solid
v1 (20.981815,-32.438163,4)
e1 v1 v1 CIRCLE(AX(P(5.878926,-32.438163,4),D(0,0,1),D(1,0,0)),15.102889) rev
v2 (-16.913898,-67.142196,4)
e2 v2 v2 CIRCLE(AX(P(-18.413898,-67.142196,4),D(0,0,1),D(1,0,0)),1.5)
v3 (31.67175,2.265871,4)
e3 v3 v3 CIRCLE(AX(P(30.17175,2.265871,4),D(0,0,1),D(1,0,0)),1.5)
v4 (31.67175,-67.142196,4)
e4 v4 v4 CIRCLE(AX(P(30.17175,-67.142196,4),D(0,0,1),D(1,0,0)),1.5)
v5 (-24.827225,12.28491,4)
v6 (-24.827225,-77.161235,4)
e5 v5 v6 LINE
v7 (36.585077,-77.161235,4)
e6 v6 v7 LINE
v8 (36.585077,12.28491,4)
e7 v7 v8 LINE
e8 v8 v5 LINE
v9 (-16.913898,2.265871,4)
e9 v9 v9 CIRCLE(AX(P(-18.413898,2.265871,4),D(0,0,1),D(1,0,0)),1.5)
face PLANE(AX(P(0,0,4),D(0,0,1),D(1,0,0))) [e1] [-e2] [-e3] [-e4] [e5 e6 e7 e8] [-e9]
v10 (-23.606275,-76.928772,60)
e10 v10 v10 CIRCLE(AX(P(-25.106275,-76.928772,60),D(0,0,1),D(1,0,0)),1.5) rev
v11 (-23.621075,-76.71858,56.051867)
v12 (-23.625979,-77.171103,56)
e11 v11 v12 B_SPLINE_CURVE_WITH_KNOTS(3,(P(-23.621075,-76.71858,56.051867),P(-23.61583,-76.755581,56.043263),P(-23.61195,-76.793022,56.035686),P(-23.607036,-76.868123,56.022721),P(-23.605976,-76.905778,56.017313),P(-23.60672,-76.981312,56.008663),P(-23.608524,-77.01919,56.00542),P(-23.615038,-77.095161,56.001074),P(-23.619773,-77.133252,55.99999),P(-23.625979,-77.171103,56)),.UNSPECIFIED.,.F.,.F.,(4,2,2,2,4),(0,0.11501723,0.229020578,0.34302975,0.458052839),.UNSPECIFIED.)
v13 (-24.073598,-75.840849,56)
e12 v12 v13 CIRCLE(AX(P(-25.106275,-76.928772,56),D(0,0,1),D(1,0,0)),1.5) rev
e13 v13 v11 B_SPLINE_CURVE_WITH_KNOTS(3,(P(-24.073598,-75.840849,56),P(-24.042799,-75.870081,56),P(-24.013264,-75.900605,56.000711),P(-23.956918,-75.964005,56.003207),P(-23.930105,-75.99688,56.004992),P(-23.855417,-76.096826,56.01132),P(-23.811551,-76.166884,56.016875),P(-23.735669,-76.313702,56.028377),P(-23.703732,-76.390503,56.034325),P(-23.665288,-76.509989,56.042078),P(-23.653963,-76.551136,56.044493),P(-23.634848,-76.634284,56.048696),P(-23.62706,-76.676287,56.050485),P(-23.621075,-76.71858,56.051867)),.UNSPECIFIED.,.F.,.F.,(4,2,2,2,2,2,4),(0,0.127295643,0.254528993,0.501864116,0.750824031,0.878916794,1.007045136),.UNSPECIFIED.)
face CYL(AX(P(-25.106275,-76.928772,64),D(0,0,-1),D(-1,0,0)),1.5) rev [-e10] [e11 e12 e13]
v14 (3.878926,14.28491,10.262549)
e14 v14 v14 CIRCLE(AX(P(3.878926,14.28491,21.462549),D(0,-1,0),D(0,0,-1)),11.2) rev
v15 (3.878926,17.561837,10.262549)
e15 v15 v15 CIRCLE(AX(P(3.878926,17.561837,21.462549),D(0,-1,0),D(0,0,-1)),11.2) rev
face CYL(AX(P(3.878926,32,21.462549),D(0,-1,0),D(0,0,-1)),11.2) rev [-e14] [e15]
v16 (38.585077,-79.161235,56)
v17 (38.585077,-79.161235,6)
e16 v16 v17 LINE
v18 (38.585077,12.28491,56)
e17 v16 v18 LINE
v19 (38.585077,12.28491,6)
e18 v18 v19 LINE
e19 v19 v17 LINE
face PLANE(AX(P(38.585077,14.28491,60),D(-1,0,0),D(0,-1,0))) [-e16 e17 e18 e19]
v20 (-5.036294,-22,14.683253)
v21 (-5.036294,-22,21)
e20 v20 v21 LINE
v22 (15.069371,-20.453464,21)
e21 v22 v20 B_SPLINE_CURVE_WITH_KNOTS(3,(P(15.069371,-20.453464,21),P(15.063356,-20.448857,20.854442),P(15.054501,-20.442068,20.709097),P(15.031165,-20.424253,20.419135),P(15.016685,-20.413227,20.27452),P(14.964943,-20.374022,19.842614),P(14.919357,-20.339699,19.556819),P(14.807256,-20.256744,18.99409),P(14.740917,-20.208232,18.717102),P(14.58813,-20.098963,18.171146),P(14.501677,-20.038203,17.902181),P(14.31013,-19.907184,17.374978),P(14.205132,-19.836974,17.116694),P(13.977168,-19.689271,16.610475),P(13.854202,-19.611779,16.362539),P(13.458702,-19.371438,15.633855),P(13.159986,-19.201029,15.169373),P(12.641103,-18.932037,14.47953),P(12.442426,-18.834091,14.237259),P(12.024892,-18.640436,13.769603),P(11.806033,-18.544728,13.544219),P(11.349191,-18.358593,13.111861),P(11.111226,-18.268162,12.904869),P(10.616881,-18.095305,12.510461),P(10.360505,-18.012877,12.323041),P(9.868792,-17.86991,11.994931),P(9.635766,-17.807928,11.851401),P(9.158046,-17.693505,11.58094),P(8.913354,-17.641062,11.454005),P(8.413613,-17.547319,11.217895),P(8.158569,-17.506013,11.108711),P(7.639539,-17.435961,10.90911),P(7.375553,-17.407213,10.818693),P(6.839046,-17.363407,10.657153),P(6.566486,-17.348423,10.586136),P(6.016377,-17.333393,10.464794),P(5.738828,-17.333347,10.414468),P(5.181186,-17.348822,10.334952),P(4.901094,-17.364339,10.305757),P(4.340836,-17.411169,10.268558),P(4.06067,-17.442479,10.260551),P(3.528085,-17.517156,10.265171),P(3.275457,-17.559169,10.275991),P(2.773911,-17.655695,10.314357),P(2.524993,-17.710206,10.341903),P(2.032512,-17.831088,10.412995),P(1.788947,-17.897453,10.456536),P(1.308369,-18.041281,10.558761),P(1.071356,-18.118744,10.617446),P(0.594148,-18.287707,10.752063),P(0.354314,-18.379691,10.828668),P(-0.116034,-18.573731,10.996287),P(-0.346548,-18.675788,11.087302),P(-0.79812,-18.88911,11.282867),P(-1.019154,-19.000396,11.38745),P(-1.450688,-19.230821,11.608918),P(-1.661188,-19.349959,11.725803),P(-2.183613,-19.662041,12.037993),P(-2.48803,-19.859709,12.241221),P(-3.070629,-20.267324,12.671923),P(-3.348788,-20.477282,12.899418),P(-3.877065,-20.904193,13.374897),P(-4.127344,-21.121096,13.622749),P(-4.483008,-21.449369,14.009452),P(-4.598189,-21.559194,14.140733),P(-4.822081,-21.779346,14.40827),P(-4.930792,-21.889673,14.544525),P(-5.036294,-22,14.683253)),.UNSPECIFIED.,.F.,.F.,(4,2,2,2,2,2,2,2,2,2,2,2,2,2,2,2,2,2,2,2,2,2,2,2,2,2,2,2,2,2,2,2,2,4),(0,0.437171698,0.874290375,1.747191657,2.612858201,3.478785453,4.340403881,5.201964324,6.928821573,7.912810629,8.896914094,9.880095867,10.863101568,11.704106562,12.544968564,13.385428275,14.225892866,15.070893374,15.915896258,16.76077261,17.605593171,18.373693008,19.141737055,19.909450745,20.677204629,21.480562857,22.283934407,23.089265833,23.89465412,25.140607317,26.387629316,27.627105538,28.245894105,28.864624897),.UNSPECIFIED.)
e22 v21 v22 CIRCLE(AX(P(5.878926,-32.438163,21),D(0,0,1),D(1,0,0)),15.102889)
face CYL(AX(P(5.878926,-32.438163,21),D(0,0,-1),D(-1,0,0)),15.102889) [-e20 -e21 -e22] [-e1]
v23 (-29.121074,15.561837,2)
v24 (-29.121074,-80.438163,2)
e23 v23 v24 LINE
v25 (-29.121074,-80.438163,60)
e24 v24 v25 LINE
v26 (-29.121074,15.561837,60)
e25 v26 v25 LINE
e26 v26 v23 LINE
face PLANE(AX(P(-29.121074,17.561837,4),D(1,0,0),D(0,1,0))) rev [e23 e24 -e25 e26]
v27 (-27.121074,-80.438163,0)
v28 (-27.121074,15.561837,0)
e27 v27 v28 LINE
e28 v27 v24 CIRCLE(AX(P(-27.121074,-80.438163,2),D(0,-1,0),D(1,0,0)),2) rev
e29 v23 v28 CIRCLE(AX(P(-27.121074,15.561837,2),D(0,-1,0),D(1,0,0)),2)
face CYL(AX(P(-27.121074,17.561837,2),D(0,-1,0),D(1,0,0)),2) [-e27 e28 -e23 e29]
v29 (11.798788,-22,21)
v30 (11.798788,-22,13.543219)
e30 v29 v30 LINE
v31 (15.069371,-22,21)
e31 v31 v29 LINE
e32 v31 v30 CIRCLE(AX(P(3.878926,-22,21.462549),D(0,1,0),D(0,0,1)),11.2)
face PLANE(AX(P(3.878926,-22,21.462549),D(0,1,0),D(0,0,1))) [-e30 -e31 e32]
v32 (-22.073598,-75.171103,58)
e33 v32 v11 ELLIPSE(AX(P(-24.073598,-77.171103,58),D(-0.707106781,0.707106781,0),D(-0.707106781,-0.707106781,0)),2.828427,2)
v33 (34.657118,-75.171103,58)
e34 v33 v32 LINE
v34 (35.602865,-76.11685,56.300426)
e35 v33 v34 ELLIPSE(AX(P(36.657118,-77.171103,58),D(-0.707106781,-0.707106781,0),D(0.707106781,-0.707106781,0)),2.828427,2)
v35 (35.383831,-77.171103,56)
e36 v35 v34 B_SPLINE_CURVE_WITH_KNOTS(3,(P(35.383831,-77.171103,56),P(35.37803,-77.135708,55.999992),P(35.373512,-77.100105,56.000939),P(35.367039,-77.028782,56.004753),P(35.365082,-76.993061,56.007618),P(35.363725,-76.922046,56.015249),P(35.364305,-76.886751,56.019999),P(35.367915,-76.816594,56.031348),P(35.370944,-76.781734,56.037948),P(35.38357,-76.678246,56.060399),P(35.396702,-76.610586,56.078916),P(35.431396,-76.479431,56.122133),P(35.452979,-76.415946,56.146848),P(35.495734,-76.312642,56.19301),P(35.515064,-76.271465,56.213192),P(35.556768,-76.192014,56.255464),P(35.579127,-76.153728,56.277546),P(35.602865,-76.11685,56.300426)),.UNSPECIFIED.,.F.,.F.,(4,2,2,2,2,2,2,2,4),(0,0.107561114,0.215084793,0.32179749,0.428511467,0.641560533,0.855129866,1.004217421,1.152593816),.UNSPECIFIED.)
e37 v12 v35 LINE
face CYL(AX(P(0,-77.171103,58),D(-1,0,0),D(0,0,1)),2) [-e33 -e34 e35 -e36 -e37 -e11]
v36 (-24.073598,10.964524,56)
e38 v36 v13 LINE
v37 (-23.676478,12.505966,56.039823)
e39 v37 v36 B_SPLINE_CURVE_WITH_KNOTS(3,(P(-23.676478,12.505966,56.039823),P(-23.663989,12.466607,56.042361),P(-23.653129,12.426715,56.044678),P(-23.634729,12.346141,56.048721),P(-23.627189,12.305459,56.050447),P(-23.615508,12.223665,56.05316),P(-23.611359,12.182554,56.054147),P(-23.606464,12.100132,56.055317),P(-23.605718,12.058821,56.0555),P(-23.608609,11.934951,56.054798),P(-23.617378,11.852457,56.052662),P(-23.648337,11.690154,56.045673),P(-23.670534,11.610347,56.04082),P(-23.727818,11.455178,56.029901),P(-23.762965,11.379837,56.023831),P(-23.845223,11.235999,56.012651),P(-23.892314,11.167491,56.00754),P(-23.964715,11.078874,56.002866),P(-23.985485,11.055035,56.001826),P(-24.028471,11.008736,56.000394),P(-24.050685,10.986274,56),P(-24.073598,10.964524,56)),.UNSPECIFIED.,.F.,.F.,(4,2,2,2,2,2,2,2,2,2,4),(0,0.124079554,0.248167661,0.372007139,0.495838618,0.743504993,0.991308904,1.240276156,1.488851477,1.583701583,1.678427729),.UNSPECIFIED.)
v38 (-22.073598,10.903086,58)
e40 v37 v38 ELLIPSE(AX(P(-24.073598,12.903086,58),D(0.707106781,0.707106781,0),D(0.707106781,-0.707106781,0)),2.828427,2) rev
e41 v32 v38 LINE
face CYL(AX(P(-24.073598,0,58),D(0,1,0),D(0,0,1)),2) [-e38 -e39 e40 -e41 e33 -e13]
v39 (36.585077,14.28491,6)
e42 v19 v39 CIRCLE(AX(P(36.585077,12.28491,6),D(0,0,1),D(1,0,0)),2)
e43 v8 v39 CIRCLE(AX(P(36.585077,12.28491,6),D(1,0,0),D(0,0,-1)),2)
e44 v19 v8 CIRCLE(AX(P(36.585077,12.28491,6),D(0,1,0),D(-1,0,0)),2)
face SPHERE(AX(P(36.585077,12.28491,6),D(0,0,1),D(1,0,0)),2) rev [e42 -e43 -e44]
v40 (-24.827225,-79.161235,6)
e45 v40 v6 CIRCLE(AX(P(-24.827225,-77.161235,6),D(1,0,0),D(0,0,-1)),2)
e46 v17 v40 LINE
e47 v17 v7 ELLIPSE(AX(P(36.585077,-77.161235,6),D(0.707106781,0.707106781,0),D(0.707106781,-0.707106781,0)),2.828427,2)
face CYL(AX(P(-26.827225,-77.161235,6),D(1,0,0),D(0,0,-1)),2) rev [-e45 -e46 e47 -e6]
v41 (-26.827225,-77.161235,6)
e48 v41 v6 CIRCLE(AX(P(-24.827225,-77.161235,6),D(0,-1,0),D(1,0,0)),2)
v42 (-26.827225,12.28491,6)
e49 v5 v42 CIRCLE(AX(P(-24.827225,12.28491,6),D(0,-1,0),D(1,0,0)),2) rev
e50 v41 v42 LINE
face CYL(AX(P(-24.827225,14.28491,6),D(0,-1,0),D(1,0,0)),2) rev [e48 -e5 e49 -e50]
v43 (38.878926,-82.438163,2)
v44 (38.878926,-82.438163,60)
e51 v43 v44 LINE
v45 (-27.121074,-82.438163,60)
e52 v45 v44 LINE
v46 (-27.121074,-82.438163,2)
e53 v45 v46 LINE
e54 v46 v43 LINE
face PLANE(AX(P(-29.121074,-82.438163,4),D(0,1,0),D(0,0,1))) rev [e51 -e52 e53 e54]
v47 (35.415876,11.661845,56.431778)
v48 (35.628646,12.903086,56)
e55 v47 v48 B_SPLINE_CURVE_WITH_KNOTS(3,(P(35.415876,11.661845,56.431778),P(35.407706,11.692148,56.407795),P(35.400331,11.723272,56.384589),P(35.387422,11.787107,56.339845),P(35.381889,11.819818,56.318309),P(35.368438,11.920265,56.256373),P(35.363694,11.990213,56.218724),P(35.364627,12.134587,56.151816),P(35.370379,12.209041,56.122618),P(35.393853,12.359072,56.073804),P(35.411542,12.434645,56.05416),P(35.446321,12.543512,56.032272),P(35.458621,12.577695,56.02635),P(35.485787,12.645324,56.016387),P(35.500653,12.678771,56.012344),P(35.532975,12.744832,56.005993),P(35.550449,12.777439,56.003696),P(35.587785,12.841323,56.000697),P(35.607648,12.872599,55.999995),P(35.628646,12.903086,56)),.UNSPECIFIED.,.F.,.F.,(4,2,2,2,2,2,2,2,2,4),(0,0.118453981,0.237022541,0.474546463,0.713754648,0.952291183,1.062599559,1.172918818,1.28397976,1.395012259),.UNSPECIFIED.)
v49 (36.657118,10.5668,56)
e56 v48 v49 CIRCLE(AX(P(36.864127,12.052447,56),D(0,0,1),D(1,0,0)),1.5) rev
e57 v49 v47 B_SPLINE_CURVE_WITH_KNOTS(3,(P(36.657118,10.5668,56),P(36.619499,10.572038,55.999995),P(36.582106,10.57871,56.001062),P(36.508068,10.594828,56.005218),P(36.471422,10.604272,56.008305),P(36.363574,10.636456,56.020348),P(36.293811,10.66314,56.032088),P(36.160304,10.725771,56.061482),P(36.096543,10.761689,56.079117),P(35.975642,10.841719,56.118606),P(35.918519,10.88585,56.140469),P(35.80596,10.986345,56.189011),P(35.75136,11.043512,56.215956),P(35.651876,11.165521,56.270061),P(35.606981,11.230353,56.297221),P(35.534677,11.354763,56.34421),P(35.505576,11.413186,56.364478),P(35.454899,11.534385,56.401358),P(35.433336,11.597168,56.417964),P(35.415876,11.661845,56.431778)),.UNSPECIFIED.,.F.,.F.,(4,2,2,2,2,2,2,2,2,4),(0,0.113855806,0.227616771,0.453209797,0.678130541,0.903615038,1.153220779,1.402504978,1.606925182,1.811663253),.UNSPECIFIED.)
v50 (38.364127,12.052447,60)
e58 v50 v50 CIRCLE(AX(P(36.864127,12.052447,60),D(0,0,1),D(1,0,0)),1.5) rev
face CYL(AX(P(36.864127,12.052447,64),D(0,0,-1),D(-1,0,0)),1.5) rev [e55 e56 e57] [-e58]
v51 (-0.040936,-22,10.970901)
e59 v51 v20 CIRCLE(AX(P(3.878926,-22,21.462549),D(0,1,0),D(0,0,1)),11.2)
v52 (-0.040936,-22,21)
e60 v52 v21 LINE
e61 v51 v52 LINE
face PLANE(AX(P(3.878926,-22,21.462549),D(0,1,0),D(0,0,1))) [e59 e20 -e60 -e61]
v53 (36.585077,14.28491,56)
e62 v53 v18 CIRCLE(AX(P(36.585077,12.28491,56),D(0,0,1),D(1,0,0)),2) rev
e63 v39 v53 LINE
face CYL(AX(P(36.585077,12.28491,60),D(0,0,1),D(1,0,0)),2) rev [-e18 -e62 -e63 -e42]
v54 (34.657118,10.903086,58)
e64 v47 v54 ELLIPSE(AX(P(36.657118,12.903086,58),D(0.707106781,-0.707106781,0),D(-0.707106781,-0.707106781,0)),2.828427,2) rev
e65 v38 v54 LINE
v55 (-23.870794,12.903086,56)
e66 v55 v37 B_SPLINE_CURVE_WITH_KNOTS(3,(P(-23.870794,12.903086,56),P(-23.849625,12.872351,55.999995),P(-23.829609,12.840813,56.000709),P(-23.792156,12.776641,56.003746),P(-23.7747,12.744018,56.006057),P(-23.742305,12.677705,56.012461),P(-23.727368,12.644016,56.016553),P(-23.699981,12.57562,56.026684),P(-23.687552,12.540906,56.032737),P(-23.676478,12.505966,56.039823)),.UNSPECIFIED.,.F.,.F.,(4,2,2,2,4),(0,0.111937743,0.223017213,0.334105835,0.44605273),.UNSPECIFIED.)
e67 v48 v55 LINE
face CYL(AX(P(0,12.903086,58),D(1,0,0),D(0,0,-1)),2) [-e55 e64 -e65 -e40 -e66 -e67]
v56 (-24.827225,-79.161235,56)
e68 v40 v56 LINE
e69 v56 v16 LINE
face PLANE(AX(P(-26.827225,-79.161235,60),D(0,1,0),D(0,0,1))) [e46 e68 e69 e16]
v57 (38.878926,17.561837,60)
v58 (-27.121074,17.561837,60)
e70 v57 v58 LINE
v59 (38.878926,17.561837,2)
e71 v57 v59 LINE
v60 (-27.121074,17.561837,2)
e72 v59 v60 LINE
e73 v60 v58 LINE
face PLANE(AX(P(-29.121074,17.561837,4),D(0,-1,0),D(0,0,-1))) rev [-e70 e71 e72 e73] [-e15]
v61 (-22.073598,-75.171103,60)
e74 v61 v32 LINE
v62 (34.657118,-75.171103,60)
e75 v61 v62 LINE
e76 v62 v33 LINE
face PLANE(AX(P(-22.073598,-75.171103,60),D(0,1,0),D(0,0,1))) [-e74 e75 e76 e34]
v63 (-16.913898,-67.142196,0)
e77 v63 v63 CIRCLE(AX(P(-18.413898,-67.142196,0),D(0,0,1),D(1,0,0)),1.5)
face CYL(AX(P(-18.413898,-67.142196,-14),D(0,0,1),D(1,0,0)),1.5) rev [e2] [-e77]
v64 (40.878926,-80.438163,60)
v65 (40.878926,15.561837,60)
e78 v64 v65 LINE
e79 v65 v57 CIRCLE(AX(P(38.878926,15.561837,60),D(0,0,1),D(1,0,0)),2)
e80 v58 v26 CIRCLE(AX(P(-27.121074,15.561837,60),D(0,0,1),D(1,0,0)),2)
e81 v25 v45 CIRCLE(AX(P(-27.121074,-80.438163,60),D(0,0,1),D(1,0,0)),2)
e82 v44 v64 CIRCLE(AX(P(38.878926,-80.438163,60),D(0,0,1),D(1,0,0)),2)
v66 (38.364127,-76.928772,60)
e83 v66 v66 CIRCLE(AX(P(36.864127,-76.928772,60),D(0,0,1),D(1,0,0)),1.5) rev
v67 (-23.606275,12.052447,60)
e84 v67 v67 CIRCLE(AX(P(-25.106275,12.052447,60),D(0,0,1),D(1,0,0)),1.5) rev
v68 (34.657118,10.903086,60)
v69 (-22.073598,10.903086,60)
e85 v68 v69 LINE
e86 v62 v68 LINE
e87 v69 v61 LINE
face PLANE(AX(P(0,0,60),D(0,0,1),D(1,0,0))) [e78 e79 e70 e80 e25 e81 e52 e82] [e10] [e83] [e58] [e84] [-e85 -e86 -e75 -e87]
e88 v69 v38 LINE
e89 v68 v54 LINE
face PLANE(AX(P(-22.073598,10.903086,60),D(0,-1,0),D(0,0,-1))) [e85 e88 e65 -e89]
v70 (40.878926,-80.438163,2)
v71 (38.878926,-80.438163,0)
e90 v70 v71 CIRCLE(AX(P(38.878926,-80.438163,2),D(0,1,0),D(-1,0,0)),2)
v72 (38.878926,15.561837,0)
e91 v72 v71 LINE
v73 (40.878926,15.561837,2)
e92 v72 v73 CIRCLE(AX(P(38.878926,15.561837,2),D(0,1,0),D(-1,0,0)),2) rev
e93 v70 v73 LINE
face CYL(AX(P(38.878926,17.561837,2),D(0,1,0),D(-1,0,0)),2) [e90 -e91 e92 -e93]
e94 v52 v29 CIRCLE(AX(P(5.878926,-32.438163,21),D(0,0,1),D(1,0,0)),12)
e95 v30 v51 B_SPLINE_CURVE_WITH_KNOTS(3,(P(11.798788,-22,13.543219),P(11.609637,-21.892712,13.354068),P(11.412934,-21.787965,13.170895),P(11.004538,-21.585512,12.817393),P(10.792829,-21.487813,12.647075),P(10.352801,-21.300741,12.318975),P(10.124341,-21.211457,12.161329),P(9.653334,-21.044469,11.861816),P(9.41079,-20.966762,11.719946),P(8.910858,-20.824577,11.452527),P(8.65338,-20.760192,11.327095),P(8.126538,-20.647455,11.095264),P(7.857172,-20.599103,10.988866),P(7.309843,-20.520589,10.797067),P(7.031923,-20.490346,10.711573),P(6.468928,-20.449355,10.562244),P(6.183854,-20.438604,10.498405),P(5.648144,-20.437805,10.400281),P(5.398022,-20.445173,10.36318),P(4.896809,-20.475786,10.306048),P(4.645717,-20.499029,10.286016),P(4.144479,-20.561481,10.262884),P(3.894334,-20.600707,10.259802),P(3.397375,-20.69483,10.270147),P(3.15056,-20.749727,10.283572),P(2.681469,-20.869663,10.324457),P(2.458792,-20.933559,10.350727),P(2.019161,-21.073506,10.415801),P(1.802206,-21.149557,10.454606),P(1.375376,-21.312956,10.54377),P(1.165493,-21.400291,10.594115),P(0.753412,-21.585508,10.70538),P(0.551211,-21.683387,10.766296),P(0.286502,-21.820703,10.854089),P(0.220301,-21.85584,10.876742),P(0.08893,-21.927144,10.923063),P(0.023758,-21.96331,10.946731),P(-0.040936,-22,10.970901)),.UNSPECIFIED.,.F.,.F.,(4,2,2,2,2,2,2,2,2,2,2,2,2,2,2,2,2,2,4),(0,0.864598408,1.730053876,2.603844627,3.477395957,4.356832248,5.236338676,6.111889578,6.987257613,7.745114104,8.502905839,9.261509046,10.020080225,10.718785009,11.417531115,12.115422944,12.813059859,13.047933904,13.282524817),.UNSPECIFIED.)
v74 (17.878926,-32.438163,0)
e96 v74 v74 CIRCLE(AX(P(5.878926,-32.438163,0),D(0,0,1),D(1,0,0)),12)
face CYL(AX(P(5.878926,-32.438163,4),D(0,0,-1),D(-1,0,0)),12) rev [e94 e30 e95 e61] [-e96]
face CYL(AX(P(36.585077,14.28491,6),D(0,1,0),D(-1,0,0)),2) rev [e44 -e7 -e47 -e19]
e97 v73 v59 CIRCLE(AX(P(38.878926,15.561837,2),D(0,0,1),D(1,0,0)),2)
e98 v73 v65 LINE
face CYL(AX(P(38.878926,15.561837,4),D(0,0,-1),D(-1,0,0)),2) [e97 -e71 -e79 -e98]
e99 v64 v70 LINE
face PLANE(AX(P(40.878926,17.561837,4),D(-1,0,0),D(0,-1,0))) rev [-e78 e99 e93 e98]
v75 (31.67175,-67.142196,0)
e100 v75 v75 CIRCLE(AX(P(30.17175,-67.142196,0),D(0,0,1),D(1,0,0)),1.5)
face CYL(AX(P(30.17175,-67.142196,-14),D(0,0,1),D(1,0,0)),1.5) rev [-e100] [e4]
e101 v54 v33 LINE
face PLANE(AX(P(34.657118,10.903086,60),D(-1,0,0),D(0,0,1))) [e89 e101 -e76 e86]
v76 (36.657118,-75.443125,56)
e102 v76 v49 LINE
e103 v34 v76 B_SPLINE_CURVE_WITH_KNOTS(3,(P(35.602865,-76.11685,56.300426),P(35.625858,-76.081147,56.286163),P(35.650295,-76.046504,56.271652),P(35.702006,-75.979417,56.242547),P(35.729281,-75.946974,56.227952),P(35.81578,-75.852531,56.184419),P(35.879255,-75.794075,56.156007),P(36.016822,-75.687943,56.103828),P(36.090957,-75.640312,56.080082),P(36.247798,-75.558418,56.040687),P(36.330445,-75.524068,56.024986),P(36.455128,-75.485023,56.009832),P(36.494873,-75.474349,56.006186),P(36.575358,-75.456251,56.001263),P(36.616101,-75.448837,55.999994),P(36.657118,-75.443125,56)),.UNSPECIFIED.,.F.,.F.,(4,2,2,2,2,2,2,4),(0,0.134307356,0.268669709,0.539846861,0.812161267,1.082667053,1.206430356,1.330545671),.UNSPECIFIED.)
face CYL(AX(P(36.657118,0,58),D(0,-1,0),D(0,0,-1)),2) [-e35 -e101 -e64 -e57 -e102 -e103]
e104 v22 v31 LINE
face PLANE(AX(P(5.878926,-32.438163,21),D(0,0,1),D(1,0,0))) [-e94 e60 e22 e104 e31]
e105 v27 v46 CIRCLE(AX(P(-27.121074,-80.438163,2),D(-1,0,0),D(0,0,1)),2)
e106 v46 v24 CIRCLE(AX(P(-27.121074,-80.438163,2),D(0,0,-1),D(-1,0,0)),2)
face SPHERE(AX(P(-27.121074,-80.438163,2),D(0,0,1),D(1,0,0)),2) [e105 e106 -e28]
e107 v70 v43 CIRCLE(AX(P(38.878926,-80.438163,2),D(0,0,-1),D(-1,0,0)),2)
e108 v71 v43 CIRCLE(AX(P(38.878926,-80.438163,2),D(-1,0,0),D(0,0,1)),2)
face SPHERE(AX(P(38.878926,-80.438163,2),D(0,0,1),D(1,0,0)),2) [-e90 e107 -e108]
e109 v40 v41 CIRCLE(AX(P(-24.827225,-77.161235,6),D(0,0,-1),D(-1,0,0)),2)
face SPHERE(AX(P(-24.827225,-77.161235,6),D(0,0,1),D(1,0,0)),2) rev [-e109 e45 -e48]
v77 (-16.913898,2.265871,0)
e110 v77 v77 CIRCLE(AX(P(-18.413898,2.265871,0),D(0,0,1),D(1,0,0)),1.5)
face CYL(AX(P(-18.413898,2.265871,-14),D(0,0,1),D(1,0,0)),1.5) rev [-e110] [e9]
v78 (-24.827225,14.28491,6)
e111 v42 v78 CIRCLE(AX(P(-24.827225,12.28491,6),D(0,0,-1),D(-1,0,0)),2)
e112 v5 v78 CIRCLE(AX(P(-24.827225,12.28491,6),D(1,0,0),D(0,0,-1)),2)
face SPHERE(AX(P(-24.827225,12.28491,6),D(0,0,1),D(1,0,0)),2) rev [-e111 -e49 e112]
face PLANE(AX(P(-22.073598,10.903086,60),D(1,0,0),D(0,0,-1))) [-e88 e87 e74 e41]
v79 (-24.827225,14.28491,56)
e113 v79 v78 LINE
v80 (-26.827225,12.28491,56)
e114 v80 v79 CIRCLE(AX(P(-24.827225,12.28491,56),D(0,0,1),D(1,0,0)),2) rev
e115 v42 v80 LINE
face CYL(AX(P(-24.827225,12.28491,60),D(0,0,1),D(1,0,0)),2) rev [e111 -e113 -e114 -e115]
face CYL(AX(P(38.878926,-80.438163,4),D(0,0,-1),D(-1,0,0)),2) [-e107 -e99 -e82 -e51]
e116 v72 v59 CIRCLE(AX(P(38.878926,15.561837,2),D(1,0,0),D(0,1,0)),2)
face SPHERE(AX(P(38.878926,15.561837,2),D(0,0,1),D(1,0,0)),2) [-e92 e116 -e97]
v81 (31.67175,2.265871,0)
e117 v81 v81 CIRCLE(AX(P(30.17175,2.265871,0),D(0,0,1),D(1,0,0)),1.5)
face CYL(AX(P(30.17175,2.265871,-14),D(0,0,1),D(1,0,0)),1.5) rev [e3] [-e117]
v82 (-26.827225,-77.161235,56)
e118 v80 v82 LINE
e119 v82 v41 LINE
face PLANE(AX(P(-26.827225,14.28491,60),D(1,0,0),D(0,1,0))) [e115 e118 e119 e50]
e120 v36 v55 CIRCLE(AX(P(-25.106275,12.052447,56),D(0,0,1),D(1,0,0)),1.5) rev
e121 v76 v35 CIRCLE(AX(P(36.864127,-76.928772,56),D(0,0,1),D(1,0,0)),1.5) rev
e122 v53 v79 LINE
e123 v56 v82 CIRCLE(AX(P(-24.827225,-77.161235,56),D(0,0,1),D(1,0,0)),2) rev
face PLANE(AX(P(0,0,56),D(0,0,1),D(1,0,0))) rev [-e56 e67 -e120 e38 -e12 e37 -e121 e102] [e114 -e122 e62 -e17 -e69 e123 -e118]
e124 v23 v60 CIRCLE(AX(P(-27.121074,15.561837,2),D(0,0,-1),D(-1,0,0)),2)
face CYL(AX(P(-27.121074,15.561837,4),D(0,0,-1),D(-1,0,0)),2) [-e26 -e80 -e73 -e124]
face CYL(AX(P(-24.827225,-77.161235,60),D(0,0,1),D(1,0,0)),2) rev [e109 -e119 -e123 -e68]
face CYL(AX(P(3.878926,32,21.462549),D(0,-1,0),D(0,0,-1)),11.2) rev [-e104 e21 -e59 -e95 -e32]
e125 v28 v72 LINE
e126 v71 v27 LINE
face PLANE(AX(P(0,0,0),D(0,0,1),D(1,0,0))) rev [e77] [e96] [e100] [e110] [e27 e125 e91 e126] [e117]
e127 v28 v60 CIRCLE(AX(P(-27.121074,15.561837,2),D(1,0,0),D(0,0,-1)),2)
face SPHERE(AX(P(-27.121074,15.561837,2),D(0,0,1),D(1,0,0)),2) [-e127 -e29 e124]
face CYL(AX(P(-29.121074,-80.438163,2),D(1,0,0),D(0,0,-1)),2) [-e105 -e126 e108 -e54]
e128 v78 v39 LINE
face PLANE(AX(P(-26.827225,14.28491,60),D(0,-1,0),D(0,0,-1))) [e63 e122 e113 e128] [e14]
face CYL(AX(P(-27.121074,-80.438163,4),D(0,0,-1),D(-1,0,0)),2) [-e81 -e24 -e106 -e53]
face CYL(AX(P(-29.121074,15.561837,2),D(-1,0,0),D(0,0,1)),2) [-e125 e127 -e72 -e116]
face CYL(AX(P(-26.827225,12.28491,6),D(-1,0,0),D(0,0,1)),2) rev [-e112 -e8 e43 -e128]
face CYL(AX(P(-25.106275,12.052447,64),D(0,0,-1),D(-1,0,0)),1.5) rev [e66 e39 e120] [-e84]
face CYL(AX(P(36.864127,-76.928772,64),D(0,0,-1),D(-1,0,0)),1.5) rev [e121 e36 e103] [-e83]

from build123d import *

# Parameters (mm, degrees)
ESBO_O1_W                   = 70
ESBO_O1_H                   = 100
ESBO_O1_R                   = 12
RESSALTO_EXTRUS_O1_DEPTH    = 4
ESBO_O2_R                   = 15.102889219
ESBO_O2_R_2                 = 12
RESSALTO_EXTRUS_O2_DEPTH    = 21
ESBO_O3_W                   = 70
ESBO_O3_H                   = 100
ESBO_O3_W_2                 = 65.412301245
ESBO_O3_H_2                 = 93.446144636
RESSALTO_EXTRUS_O3_DEPTH    = 60
FILETE1_R                   = 2
FILETE2_R                   = 2
FILETE3_R                   = 2
FILETE4_R                   = 2
FILETE5_R                   = 2
CORTE_EXTRUS_O1_DEPTH       = 17
CORTE_EXTRUS_O1_DEPTH_BACK  = 14
ESBO_O4_R                   = 1.5
FILETE6_R                   = 2
FILETE7_R                   = 2
RESSALTO_EXTRUS_O4_DEPTH    = 4
CORTE_EXTRUS_O2_DEPTH       = 4
CORTE_EXTRUS_O2_DEPTH_BACK  = 14
ESBO_O5_R                   = 1.5
FILETE8_R                   = 2
CORTE_EXTRUS_O10_DEPTH      = 32
CORTE_EXTRUS_O10_DEPTH_BACK = 22
ESBO_O6_R                   = 11.2


with BuildPart() as part:
    # Esboço1 → Ressalto-extrusão1 (new body)
    with BuildSketch(Plane.XY):
        with Locations((5.878926005, -32.438162544)):
            Rectangle(ESBO_O1_W, ESBO_O1_H)
        with Locations((5.878926005, -32.438162544)):
            Circle(ESBO_O1_R, mode=Mode.SUBTRACT)
    extrude(amount=RESSALTO_EXTRUS_O1_DEPTH)

    # Esboço2 → Ressalto-extrusão2 (add)
    with BuildSketch(Plane.XY):
        with Locations(Location((5.878926005, -32.438162544, 0), (0, 0, 180))):
            Circle(ESBO_O2_R)
        with Locations((5.878926005, -32.438162544)):
            Circle(ESBO_O2_R_2, mode=Mode.SUBTRACT)
    extrude(amount=RESSALTO_EXTRUS_O2_DEPTH)

    # Esboço3 → Ressalto-extrusão3 (add)
    with BuildSketch(Plane.XY):
        with Locations((5.878926005, -32.438162544)):
            Rectangle(ESBO_O3_W, ESBO_O3_H)
        with Locations((5.878926006, -32.438162544)):
            Rectangle(ESBO_O3_W_2, ESBO_O3_H_2, mode=Mode.SUBTRACT)
    extrude(amount=RESSALTO_EXTRUS_O3_DEPTH)

    # Filete1
    filete1_edges = [part.edges().sort_by_distance(p)[0] for p in [
        (-29.121073995, -32.438162544, 0),
    ]]
    fillet(filete1_edges, radius=FILETE1_R)

    # Filete2
    filete2_edges = [part.edges().sort_by_distance(p)[0] for p in [
        (40.878926005, -32.438162544, 0),
    ]]
    fillet(filete2_edges, radius=FILETE2_R)

    # Filete3
    filete3_edges = [part.edges().sort_by_distance(p)[0] for p in [
        (-26.827224617, -32.438162544, 4),
    ]]
    fillet(filete3_edges, radius=FILETE3_R)

    # Filete4
    filete4_edges = [part.edges().sort_by_distance(p)[0] for p in [
        (-26.827224617, -79.161234862, 33),
        (6.878926005, -79.161234862, 4),
        (38.585076628, -32.438162544, 4),
        (-26.24143818, -79.161234862, 4.585786438),
    ]]
    fillet(filete4_edges, radius=FILETE4_R)

    # Filete5
    filete5_edges = [part.edges().sort_by_distance(p)[0] for p in [
        (38.585076628, 14.284909774, 33),
        (-26.827224617, 14.284909774, 33),
        (5.878926005, 14.284909774, 4),
        (-26.24143818, 14.284909774, 4.585786438),
        (37.99929019, 14.284909774, 4.585786438),
    ]]
    fillet(filete5_edges, radius=FILETE5_R)

    # Esboço4 → Corte-extrusão1 (cut, two sides: drawn at the far end of the back side and taken through both)
    with BuildSketch(Plane.XY.offset(-CORTE_EXTRUS_O1_DEPTH_BACK)):
        with Locations((-18.413897623, 2.265871211)):
            Circle(ESBO_O4_R)
        with Locations((30.171749634, 2.265871211)):
            Circle(ESBO_O4_R)
        with Locations((30.171749634, -67.142196299)):
            Circle(ESBO_O4_R)
        with Locations((-18.413897623, -67.142196299)):
            Circle(ESBO_O4_R)
    extrude(amount=CORTE_EXTRUS_O1_DEPTH + CORTE_EXTRUS_O1_DEPTH_BACK, mode=Mode.SUBTRACT)

    # Filete6
    filete6_edges = [part.edges().sort_by_distance(p)[0] for p in [
        (-28.535287557, 17.561837456, 0.585786438),
        (5.878926005, 17.561837456, 0),
        (40.293139568, 17.561837456, 0.585786438),
        (-29.121073995, 17.561837456, 31),
        (40.878926005, 17.561837456, 31),
    ]]
    fillet(filete6_edges, radius=FILETE6_R)

    # Filete7
    filete7_edges = [part.edges().sort_by_distance(p)[0] for p in [
        (5.878926005, -82.438162544, 0),
        (-28.535287557, -82.438162544, 0.585786438),
        (40.293139568, -82.438162544, 0.585786438),
        (40.878926005, -82.438162544, 31),
        (-29.121073995, -82.438162544, 31),
    ]]
    fillet(filete7_edges, radius=FILETE7_R)

    # 3DSketch1 → Ressalto-extrusão4 (add)
    with BuildSketch(Plane(origin=(-26.827224617, -78.648847783, 60), x_dir=(0.5739296342961376, 0.81890461891279, 0), z_dir=(0, 0, 1))):
        Polygon((0, 0), (-1.957959753, -1.372236887), (36.074200136, -55.637968328), (115.460568304, 0), (77.428408415, 54.265731441), (77.149565293, 54.070304126), (75.833057159, 55.948747976), (-1.316508134, 1.87844385), align=None)
        Polygon((76.062739818, 47.503741973), (108.622178683, 1.046696924), (38.135627574, -48.353831008), (5.57618871, -1.896785959), align=None, mode=Mode.SUBTRACT)
    extrude(amount=-RESSALTO_EXTRUS_O4_DEPTH)

    # Esboço5 → Corte-extrusão2 (cut, two sides: drawn at the far end of the back side and taken through both)
    with BuildSketch(Plane.XY.offset(60).offset(-CORTE_EXTRUS_O2_DEPTH_BACK)):
        with Locations((-25.106275155, 12.052447262)):
            Circle(ESBO_O5_R)
        with Locations((36.864127165, -76.928772351)):
            Circle(ESBO_O5_R)
        with Locations((36.864127165, 12.052447262)):
            Circle(ESBO_O5_R)
        with Locations((-25.106275155, -76.928772351)):
            Circle(ESBO_O5_R)
    extrude(amount=CORTE_EXTRUS_O2_DEPTH + CORTE_EXTRUS_O2_DEPTH_BACK, mode=Mode.SUBTRACT)

    # Filete8
    # the kernel refuses this fillet: 2 mm, written as the material it takes off along each edge
    with BuildSketch(Plane(origin=(-22.073597887, 10.90308644, 56), x_dir=(0, 0, 1), z_dir=(1, 0, 0)), Plane(origin=(34.657117725, -75.171102764, 56), x_dir=(0, 0, 1), z_dir=(-1, 0, 0))) as filete8_piece_1:
        with BuildLine():
            CenterArc((FILETE8_R, -FILETE8_R), FILETE8_R, 90, 90)
            Line((0, -FILETE8_R), (-FILETE8_R * 0.02, -FILETE8_R))
            Line((-FILETE8_R * 0.02, -FILETE8_R), (-FILETE8_R * 0.02, FILETE8_R * 0.02))
            Line((-FILETE8_R * 0.02, FILETE8_R * 0.02), (FILETE8_R, FILETE8_R * 0.02))
            Line((FILETE8_R, FILETE8_R * 0.02), (FILETE8_R, 0))
        make_face()
    extrude(amount=56.730715612, mode=Mode.SUBTRACT)
    with BuildSketch(Plane(origin=(-22.073597887, -75.171102764, 56), x_dir=(0, 0, 1), z_dir=(0, 1, 0)), Plane(origin=(34.657117725, 10.90308644, 56), x_dir=(0, 0, 1), z_dir=(0, -1, 0))) as filete8_piece_2:
        with BuildLine():
            CenterArc((FILETE8_R, -FILETE8_R), FILETE8_R, 90, 90)
            Line((0, -FILETE8_R), (-FILETE8_R * 0.02, -FILETE8_R))
            Line((-FILETE8_R * 0.02, -FILETE8_R), (-FILETE8_R * 0.02, FILETE8_R * 0.02))
            Line((-FILETE8_R * 0.02, FILETE8_R * 0.02), (FILETE8_R, FILETE8_R * 0.02))
            Line((FILETE8_R, FILETE8_R * 0.02), (FILETE8_R, 0))
        make_face()
    extrude(amount=86.074189204, mode=Mode.SUBTRACT)
    with BuildSketch(Plane(origin=(-27.073597887, 10.90308644, 56), x_dir=(0, 0, 1), z_dir=(1, 0, 0))) as filete8_piece_3a_section:
        with BuildLine():
            CenterArc((FILETE8_R, -FILETE8_R), FILETE8_R, 90, 90)
            Line((0, -FILETE8_R), (-FILETE8_R * 0.02, -FILETE8_R))
            Line((-FILETE8_R * 0.02, -FILETE8_R), (-FILETE8_R * 0.02, FILETE8_R * 0.02))
            Line((-FILETE8_R * 0.02, FILETE8_R * 0.02), (FILETE8_R, FILETE8_R * 0.02))
            Line((FILETE8_R, FILETE8_R * 0.02), (FILETE8_R, 0))
        make_face()
    filete8_piece_3a = extrude(amount=61.730715612, mode=Mode.PRIVATE)
    filete8_piece_3a = split(filete8_piece_3a, bisect_by=Plane(origin=(-22.073597887, 11.355876668, 56.452790229), z_dir=(-1, 0, 0)), keep=Keep.TOP, mode=Mode.PRIVATE)
    with BuildSketch(Plane(origin=(-22.073597887, -75.171102764, 56), x_dir=(0, 0, 1), z_dir=(0, 1, 0))) as filete8_piece_3b_section:
        with BuildLine():
            CenterArc((FILETE8_R, -FILETE8_R), FILETE8_R, 90, 90)
            Line((0, -FILETE8_R), (-FILETE8_R * 0.02, -FILETE8_R))
            Line((-FILETE8_R * 0.02, -FILETE8_R), (-FILETE8_R * 0.02, FILETE8_R * 0.02))
            Line((-FILETE8_R * 0.02, FILETE8_R * 0.02), (FILETE8_R, FILETE8_R * 0.02))
            Line((FILETE8_R, FILETE8_R * 0.02), (FILETE8_R, 0))
        make_face()
    filete8_piece_3b = extrude(amount=91.074189204, mode=Mode.PRIVATE)
    filete8_piece_3b = split(filete8_piece_3b, bisect_by=Plane(origin=(-22.526388116, 10.90308644, 56.452790229), z_dir=(0, 1, 0)), keep=Keep.TOP, mode=Mode.PRIVATE)
    filete8_piece_3 = filete8_piece_3a & filete8_piece_3b
    add(filete8_piece_3, mode=Mode.SUBTRACT)
    with BuildSketch(Plane(origin=(34.657117725, 15.90308644, 56), x_dir=(0, 0, 1), z_dir=(0, -1, 0))) as filete8_piece_4a_section:
        with BuildLine():
            CenterArc((FILETE8_R, -FILETE8_R), FILETE8_R, 90, 90)
            Line((0, -FILETE8_R), (-FILETE8_R * 0.02, -FILETE8_R))
            Line((-FILETE8_R * 0.02, -FILETE8_R), (-FILETE8_R * 0.02, FILETE8_R * 0.02))
            Line((-FILETE8_R * 0.02, FILETE8_R * 0.02), (FILETE8_R, FILETE8_R * 0.02))
            Line((FILETE8_R, FILETE8_R * 0.02), (FILETE8_R, 0))
        make_face()
    filete8_piece_4a = extrude(amount=91.074189204, mode=Mode.PRIVATE)
    filete8_piece_4a = split(filete8_piece_4a, bisect_by=Plane(origin=(35.109907953, 10.90308644, 56.452790229), z_dir=(0, 1, 0)), keep=Keep.TOP, mode=Mode.PRIVATE)
    with BuildSketch(Plane(origin=(-22.073597887, 10.90308644, 56), x_dir=(0, 0, 1), z_dir=(1, 0, 0))) as filete8_piece_4b_section:
        with BuildLine():
            CenterArc((FILETE8_R, -FILETE8_R), FILETE8_R, 90, 90)
            Line((0, -FILETE8_R), (-FILETE8_R * 0.02, -FILETE8_R))
            Line((-FILETE8_R * 0.02, -FILETE8_R), (-FILETE8_R * 0.02, FILETE8_R * 0.02))
            Line((-FILETE8_R * 0.02, FILETE8_R * 0.02), (FILETE8_R, FILETE8_R * 0.02))
            Line((FILETE8_R, FILETE8_R * 0.02), (FILETE8_R, 0))
        make_face()
    filete8_piece_4b = extrude(amount=61.730715612, mode=Mode.PRIVATE)
    filete8_piece_4b = split(filete8_piece_4b, bisect_by=Plane(origin=(34.657117725, 11.355876668, 56.452790229), z_dir=(1, 0, 0)), keep=Keep.TOP, mode=Mode.PRIVATE)
    filete8_piece_4 = filete8_piece_4a & filete8_piece_4b
    add(filete8_piece_4, mode=Mode.SUBTRACT)
    with BuildSketch(Plane(origin=(34.657117725, -75.171102764, 56), x_dir=(0, 0, 1), z_dir=(-1, 0, 0))) as filete8_piece_5a_section:
        with BuildLine():
            CenterArc((FILETE8_R, -FILETE8_R), FILETE8_R, 90, 90)
            Line((0, -FILETE8_R), (-FILETE8_R * 0.02, -FILETE8_R))
            Line((-FILETE8_R * 0.02, -FILETE8_R), (-FILETE8_R * 0.02, FILETE8_R * 0.02))
            Line((-FILETE8_R * 0.02, FILETE8_R * 0.02), (FILETE8_R, FILETE8_R * 0.02))
            Line((FILETE8_R, FILETE8_R * 0.02), (FILETE8_R, 0))
        make_face()
    filete8_piece_5a = extrude(amount=61.730715612, mode=Mode.PRIVATE)
    filete8_piece_5a = split(filete8_piece_5a, bisect_by=Plane(origin=(-22.073597887, -75.623892993, 56.452790229), z_dir=(-1, 0, 0)), keep=Keep.TOP, mode=Mode.PRIVATE)
    with BuildSketch(Plane(origin=(-22.073597887, -80.171102764, 56), x_dir=(0, 0, 1), z_dir=(0, 1, 0))) as filete8_piece_5b_section:
        with BuildLine():
            CenterArc((FILETE8_R, -FILETE8_R), FILETE8_R, 90, 90)
            Line((0, -FILETE8_R), (-FILETE8_R * 0.02, -FILETE8_R))
            Line((-FILETE8_R * 0.02, -FILETE8_R), (-FILETE8_R * 0.02, FILETE8_R * 0.02))
            Line((-FILETE8_R * 0.02, FILETE8_R * 0.02), (FILETE8_R, FILETE8_R * 0.02))
            Line((FILETE8_R, FILETE8_R * 0.02), (FILETE8_R, 0))
        make_face()
    filete8_piece_5b = extrude(amount=91.074189204, mode=Mode.PRIVATE)
    filete8_piece_5b = split(filete8_piece_5b, bisect_by=Plane(origin=(-22.526388116, -75.171102764, 56.452790229), z_dir=(0, -1, 0)), keep=Keep.TOP, mode=Mode.PRIVATE)
    filete8_piece_5 = filete8_piece_5a & filete8_piece_5b
    add(filete8_piece_5, mode=Mode.SUBTRACT)
    with BuildSketch(Plane(origin=(34.657117725, 10.90308644, 56), x_dir=(0, 0, 1), z_dir=(0, -1, 0))) as filete8_piece_6a_section:
        with BuildLine():
            CenterArc((FILETE8_R, -FILETE8_R), FILETE8_R, 90, 90)
            Line((0, -FILETE8_R), (-FILETE8_R * 0.02, -FILETE8_R))
            Line((-FILETE8_R * 0.02, -FILETE8_R), (-FILETE8_R * 0.02, FILETE8_R * 0.02))
            Line((-FILETE8_R * 0.02, FILETE8_R * 0.02), (FILETE8_R, FILETE8_R * 0.02))
            Line((FILETE8_R, FILETE8_R * 0.02), (FILETE8_R, 0))
        make_face()
    filete8_piece_6a = extrude(amount=91.074189204, mode=Mode.PRIVATE)
    filete8_piece_6a = split(filete8_piece_6a, bisect_by=Plane(origin=(35.109907953, -75.171102764, 56.452790229), z_dir=(0, -1, 0)), keep=Keep.TOP, mode=Mode.PRIVATE)
    with BuildSketch(Plane(origin=(39.657117725, -75.171102764, 56), x_dir=(0, 0, 1), z_dir=(-1, 0, 0))) as filete8_piece_6b_section:
        with BuildLine():
            CenterArc((FILETE8_R, -FILETE8_R), FILETE8_R, 90, 90)
            Line((0, -FILETE8_R), (-FILETE8_R * 0.02, -FILETE8_R))
            Line((-FILETE8_R * 0.02, -FILETE8_R), (-FILETE8_R * 0.02, FILETE8_R * 0.02))
            Line((-FILETE8_R * 0.02, FILETE8_R * 0.02), (FILETE8_R, FILETE8_R * 0.02))
            Line((FILETE8_R, FILETE8_R * 0.02), (FILETE8_R, 0))
        make_face()
    filete8_piece_6b = extrude(amount=61.730715612, mode=Mode.PRIVATE)
    filete8_piece_6b = split(filete8_piece_6b, bisect_by=Plane(origin=(34.657117725, -75.623892993, 56.452790229), z_dir=(1, 0, 0)), keep=Keep.TOP, mode=Mode.PRIVATE)
    filete8_piece_6 = filete8_piece_6a & filete8_piece_6b
    add(filete8_piece_6, mode=Mode.SUBTRACT)

    # Esboço6 → Corte-extrusão10 (cut, two sides: drawn at the far end of the back side and taken through both)
    with BuildSketch(Plane(origin=(0, 0, 0), x_dir=(1, 0, 0), z_dir=(0, 1, 0)).offset(-CORTE_EXTRUS_O10_DEPTH_BACK)):
        with Locations(Location((3.878926005, -21.462549215, 0), (0, 0, 90))):
            Circle(ESBO_O6_R)
    extrude(amount=CORTE_EXTRUS_O10_DEPTH + CORTE_EXTRUS_O10_DEPTH_BACK, mode=Mode.SUBTRACT)


solid = part.part
